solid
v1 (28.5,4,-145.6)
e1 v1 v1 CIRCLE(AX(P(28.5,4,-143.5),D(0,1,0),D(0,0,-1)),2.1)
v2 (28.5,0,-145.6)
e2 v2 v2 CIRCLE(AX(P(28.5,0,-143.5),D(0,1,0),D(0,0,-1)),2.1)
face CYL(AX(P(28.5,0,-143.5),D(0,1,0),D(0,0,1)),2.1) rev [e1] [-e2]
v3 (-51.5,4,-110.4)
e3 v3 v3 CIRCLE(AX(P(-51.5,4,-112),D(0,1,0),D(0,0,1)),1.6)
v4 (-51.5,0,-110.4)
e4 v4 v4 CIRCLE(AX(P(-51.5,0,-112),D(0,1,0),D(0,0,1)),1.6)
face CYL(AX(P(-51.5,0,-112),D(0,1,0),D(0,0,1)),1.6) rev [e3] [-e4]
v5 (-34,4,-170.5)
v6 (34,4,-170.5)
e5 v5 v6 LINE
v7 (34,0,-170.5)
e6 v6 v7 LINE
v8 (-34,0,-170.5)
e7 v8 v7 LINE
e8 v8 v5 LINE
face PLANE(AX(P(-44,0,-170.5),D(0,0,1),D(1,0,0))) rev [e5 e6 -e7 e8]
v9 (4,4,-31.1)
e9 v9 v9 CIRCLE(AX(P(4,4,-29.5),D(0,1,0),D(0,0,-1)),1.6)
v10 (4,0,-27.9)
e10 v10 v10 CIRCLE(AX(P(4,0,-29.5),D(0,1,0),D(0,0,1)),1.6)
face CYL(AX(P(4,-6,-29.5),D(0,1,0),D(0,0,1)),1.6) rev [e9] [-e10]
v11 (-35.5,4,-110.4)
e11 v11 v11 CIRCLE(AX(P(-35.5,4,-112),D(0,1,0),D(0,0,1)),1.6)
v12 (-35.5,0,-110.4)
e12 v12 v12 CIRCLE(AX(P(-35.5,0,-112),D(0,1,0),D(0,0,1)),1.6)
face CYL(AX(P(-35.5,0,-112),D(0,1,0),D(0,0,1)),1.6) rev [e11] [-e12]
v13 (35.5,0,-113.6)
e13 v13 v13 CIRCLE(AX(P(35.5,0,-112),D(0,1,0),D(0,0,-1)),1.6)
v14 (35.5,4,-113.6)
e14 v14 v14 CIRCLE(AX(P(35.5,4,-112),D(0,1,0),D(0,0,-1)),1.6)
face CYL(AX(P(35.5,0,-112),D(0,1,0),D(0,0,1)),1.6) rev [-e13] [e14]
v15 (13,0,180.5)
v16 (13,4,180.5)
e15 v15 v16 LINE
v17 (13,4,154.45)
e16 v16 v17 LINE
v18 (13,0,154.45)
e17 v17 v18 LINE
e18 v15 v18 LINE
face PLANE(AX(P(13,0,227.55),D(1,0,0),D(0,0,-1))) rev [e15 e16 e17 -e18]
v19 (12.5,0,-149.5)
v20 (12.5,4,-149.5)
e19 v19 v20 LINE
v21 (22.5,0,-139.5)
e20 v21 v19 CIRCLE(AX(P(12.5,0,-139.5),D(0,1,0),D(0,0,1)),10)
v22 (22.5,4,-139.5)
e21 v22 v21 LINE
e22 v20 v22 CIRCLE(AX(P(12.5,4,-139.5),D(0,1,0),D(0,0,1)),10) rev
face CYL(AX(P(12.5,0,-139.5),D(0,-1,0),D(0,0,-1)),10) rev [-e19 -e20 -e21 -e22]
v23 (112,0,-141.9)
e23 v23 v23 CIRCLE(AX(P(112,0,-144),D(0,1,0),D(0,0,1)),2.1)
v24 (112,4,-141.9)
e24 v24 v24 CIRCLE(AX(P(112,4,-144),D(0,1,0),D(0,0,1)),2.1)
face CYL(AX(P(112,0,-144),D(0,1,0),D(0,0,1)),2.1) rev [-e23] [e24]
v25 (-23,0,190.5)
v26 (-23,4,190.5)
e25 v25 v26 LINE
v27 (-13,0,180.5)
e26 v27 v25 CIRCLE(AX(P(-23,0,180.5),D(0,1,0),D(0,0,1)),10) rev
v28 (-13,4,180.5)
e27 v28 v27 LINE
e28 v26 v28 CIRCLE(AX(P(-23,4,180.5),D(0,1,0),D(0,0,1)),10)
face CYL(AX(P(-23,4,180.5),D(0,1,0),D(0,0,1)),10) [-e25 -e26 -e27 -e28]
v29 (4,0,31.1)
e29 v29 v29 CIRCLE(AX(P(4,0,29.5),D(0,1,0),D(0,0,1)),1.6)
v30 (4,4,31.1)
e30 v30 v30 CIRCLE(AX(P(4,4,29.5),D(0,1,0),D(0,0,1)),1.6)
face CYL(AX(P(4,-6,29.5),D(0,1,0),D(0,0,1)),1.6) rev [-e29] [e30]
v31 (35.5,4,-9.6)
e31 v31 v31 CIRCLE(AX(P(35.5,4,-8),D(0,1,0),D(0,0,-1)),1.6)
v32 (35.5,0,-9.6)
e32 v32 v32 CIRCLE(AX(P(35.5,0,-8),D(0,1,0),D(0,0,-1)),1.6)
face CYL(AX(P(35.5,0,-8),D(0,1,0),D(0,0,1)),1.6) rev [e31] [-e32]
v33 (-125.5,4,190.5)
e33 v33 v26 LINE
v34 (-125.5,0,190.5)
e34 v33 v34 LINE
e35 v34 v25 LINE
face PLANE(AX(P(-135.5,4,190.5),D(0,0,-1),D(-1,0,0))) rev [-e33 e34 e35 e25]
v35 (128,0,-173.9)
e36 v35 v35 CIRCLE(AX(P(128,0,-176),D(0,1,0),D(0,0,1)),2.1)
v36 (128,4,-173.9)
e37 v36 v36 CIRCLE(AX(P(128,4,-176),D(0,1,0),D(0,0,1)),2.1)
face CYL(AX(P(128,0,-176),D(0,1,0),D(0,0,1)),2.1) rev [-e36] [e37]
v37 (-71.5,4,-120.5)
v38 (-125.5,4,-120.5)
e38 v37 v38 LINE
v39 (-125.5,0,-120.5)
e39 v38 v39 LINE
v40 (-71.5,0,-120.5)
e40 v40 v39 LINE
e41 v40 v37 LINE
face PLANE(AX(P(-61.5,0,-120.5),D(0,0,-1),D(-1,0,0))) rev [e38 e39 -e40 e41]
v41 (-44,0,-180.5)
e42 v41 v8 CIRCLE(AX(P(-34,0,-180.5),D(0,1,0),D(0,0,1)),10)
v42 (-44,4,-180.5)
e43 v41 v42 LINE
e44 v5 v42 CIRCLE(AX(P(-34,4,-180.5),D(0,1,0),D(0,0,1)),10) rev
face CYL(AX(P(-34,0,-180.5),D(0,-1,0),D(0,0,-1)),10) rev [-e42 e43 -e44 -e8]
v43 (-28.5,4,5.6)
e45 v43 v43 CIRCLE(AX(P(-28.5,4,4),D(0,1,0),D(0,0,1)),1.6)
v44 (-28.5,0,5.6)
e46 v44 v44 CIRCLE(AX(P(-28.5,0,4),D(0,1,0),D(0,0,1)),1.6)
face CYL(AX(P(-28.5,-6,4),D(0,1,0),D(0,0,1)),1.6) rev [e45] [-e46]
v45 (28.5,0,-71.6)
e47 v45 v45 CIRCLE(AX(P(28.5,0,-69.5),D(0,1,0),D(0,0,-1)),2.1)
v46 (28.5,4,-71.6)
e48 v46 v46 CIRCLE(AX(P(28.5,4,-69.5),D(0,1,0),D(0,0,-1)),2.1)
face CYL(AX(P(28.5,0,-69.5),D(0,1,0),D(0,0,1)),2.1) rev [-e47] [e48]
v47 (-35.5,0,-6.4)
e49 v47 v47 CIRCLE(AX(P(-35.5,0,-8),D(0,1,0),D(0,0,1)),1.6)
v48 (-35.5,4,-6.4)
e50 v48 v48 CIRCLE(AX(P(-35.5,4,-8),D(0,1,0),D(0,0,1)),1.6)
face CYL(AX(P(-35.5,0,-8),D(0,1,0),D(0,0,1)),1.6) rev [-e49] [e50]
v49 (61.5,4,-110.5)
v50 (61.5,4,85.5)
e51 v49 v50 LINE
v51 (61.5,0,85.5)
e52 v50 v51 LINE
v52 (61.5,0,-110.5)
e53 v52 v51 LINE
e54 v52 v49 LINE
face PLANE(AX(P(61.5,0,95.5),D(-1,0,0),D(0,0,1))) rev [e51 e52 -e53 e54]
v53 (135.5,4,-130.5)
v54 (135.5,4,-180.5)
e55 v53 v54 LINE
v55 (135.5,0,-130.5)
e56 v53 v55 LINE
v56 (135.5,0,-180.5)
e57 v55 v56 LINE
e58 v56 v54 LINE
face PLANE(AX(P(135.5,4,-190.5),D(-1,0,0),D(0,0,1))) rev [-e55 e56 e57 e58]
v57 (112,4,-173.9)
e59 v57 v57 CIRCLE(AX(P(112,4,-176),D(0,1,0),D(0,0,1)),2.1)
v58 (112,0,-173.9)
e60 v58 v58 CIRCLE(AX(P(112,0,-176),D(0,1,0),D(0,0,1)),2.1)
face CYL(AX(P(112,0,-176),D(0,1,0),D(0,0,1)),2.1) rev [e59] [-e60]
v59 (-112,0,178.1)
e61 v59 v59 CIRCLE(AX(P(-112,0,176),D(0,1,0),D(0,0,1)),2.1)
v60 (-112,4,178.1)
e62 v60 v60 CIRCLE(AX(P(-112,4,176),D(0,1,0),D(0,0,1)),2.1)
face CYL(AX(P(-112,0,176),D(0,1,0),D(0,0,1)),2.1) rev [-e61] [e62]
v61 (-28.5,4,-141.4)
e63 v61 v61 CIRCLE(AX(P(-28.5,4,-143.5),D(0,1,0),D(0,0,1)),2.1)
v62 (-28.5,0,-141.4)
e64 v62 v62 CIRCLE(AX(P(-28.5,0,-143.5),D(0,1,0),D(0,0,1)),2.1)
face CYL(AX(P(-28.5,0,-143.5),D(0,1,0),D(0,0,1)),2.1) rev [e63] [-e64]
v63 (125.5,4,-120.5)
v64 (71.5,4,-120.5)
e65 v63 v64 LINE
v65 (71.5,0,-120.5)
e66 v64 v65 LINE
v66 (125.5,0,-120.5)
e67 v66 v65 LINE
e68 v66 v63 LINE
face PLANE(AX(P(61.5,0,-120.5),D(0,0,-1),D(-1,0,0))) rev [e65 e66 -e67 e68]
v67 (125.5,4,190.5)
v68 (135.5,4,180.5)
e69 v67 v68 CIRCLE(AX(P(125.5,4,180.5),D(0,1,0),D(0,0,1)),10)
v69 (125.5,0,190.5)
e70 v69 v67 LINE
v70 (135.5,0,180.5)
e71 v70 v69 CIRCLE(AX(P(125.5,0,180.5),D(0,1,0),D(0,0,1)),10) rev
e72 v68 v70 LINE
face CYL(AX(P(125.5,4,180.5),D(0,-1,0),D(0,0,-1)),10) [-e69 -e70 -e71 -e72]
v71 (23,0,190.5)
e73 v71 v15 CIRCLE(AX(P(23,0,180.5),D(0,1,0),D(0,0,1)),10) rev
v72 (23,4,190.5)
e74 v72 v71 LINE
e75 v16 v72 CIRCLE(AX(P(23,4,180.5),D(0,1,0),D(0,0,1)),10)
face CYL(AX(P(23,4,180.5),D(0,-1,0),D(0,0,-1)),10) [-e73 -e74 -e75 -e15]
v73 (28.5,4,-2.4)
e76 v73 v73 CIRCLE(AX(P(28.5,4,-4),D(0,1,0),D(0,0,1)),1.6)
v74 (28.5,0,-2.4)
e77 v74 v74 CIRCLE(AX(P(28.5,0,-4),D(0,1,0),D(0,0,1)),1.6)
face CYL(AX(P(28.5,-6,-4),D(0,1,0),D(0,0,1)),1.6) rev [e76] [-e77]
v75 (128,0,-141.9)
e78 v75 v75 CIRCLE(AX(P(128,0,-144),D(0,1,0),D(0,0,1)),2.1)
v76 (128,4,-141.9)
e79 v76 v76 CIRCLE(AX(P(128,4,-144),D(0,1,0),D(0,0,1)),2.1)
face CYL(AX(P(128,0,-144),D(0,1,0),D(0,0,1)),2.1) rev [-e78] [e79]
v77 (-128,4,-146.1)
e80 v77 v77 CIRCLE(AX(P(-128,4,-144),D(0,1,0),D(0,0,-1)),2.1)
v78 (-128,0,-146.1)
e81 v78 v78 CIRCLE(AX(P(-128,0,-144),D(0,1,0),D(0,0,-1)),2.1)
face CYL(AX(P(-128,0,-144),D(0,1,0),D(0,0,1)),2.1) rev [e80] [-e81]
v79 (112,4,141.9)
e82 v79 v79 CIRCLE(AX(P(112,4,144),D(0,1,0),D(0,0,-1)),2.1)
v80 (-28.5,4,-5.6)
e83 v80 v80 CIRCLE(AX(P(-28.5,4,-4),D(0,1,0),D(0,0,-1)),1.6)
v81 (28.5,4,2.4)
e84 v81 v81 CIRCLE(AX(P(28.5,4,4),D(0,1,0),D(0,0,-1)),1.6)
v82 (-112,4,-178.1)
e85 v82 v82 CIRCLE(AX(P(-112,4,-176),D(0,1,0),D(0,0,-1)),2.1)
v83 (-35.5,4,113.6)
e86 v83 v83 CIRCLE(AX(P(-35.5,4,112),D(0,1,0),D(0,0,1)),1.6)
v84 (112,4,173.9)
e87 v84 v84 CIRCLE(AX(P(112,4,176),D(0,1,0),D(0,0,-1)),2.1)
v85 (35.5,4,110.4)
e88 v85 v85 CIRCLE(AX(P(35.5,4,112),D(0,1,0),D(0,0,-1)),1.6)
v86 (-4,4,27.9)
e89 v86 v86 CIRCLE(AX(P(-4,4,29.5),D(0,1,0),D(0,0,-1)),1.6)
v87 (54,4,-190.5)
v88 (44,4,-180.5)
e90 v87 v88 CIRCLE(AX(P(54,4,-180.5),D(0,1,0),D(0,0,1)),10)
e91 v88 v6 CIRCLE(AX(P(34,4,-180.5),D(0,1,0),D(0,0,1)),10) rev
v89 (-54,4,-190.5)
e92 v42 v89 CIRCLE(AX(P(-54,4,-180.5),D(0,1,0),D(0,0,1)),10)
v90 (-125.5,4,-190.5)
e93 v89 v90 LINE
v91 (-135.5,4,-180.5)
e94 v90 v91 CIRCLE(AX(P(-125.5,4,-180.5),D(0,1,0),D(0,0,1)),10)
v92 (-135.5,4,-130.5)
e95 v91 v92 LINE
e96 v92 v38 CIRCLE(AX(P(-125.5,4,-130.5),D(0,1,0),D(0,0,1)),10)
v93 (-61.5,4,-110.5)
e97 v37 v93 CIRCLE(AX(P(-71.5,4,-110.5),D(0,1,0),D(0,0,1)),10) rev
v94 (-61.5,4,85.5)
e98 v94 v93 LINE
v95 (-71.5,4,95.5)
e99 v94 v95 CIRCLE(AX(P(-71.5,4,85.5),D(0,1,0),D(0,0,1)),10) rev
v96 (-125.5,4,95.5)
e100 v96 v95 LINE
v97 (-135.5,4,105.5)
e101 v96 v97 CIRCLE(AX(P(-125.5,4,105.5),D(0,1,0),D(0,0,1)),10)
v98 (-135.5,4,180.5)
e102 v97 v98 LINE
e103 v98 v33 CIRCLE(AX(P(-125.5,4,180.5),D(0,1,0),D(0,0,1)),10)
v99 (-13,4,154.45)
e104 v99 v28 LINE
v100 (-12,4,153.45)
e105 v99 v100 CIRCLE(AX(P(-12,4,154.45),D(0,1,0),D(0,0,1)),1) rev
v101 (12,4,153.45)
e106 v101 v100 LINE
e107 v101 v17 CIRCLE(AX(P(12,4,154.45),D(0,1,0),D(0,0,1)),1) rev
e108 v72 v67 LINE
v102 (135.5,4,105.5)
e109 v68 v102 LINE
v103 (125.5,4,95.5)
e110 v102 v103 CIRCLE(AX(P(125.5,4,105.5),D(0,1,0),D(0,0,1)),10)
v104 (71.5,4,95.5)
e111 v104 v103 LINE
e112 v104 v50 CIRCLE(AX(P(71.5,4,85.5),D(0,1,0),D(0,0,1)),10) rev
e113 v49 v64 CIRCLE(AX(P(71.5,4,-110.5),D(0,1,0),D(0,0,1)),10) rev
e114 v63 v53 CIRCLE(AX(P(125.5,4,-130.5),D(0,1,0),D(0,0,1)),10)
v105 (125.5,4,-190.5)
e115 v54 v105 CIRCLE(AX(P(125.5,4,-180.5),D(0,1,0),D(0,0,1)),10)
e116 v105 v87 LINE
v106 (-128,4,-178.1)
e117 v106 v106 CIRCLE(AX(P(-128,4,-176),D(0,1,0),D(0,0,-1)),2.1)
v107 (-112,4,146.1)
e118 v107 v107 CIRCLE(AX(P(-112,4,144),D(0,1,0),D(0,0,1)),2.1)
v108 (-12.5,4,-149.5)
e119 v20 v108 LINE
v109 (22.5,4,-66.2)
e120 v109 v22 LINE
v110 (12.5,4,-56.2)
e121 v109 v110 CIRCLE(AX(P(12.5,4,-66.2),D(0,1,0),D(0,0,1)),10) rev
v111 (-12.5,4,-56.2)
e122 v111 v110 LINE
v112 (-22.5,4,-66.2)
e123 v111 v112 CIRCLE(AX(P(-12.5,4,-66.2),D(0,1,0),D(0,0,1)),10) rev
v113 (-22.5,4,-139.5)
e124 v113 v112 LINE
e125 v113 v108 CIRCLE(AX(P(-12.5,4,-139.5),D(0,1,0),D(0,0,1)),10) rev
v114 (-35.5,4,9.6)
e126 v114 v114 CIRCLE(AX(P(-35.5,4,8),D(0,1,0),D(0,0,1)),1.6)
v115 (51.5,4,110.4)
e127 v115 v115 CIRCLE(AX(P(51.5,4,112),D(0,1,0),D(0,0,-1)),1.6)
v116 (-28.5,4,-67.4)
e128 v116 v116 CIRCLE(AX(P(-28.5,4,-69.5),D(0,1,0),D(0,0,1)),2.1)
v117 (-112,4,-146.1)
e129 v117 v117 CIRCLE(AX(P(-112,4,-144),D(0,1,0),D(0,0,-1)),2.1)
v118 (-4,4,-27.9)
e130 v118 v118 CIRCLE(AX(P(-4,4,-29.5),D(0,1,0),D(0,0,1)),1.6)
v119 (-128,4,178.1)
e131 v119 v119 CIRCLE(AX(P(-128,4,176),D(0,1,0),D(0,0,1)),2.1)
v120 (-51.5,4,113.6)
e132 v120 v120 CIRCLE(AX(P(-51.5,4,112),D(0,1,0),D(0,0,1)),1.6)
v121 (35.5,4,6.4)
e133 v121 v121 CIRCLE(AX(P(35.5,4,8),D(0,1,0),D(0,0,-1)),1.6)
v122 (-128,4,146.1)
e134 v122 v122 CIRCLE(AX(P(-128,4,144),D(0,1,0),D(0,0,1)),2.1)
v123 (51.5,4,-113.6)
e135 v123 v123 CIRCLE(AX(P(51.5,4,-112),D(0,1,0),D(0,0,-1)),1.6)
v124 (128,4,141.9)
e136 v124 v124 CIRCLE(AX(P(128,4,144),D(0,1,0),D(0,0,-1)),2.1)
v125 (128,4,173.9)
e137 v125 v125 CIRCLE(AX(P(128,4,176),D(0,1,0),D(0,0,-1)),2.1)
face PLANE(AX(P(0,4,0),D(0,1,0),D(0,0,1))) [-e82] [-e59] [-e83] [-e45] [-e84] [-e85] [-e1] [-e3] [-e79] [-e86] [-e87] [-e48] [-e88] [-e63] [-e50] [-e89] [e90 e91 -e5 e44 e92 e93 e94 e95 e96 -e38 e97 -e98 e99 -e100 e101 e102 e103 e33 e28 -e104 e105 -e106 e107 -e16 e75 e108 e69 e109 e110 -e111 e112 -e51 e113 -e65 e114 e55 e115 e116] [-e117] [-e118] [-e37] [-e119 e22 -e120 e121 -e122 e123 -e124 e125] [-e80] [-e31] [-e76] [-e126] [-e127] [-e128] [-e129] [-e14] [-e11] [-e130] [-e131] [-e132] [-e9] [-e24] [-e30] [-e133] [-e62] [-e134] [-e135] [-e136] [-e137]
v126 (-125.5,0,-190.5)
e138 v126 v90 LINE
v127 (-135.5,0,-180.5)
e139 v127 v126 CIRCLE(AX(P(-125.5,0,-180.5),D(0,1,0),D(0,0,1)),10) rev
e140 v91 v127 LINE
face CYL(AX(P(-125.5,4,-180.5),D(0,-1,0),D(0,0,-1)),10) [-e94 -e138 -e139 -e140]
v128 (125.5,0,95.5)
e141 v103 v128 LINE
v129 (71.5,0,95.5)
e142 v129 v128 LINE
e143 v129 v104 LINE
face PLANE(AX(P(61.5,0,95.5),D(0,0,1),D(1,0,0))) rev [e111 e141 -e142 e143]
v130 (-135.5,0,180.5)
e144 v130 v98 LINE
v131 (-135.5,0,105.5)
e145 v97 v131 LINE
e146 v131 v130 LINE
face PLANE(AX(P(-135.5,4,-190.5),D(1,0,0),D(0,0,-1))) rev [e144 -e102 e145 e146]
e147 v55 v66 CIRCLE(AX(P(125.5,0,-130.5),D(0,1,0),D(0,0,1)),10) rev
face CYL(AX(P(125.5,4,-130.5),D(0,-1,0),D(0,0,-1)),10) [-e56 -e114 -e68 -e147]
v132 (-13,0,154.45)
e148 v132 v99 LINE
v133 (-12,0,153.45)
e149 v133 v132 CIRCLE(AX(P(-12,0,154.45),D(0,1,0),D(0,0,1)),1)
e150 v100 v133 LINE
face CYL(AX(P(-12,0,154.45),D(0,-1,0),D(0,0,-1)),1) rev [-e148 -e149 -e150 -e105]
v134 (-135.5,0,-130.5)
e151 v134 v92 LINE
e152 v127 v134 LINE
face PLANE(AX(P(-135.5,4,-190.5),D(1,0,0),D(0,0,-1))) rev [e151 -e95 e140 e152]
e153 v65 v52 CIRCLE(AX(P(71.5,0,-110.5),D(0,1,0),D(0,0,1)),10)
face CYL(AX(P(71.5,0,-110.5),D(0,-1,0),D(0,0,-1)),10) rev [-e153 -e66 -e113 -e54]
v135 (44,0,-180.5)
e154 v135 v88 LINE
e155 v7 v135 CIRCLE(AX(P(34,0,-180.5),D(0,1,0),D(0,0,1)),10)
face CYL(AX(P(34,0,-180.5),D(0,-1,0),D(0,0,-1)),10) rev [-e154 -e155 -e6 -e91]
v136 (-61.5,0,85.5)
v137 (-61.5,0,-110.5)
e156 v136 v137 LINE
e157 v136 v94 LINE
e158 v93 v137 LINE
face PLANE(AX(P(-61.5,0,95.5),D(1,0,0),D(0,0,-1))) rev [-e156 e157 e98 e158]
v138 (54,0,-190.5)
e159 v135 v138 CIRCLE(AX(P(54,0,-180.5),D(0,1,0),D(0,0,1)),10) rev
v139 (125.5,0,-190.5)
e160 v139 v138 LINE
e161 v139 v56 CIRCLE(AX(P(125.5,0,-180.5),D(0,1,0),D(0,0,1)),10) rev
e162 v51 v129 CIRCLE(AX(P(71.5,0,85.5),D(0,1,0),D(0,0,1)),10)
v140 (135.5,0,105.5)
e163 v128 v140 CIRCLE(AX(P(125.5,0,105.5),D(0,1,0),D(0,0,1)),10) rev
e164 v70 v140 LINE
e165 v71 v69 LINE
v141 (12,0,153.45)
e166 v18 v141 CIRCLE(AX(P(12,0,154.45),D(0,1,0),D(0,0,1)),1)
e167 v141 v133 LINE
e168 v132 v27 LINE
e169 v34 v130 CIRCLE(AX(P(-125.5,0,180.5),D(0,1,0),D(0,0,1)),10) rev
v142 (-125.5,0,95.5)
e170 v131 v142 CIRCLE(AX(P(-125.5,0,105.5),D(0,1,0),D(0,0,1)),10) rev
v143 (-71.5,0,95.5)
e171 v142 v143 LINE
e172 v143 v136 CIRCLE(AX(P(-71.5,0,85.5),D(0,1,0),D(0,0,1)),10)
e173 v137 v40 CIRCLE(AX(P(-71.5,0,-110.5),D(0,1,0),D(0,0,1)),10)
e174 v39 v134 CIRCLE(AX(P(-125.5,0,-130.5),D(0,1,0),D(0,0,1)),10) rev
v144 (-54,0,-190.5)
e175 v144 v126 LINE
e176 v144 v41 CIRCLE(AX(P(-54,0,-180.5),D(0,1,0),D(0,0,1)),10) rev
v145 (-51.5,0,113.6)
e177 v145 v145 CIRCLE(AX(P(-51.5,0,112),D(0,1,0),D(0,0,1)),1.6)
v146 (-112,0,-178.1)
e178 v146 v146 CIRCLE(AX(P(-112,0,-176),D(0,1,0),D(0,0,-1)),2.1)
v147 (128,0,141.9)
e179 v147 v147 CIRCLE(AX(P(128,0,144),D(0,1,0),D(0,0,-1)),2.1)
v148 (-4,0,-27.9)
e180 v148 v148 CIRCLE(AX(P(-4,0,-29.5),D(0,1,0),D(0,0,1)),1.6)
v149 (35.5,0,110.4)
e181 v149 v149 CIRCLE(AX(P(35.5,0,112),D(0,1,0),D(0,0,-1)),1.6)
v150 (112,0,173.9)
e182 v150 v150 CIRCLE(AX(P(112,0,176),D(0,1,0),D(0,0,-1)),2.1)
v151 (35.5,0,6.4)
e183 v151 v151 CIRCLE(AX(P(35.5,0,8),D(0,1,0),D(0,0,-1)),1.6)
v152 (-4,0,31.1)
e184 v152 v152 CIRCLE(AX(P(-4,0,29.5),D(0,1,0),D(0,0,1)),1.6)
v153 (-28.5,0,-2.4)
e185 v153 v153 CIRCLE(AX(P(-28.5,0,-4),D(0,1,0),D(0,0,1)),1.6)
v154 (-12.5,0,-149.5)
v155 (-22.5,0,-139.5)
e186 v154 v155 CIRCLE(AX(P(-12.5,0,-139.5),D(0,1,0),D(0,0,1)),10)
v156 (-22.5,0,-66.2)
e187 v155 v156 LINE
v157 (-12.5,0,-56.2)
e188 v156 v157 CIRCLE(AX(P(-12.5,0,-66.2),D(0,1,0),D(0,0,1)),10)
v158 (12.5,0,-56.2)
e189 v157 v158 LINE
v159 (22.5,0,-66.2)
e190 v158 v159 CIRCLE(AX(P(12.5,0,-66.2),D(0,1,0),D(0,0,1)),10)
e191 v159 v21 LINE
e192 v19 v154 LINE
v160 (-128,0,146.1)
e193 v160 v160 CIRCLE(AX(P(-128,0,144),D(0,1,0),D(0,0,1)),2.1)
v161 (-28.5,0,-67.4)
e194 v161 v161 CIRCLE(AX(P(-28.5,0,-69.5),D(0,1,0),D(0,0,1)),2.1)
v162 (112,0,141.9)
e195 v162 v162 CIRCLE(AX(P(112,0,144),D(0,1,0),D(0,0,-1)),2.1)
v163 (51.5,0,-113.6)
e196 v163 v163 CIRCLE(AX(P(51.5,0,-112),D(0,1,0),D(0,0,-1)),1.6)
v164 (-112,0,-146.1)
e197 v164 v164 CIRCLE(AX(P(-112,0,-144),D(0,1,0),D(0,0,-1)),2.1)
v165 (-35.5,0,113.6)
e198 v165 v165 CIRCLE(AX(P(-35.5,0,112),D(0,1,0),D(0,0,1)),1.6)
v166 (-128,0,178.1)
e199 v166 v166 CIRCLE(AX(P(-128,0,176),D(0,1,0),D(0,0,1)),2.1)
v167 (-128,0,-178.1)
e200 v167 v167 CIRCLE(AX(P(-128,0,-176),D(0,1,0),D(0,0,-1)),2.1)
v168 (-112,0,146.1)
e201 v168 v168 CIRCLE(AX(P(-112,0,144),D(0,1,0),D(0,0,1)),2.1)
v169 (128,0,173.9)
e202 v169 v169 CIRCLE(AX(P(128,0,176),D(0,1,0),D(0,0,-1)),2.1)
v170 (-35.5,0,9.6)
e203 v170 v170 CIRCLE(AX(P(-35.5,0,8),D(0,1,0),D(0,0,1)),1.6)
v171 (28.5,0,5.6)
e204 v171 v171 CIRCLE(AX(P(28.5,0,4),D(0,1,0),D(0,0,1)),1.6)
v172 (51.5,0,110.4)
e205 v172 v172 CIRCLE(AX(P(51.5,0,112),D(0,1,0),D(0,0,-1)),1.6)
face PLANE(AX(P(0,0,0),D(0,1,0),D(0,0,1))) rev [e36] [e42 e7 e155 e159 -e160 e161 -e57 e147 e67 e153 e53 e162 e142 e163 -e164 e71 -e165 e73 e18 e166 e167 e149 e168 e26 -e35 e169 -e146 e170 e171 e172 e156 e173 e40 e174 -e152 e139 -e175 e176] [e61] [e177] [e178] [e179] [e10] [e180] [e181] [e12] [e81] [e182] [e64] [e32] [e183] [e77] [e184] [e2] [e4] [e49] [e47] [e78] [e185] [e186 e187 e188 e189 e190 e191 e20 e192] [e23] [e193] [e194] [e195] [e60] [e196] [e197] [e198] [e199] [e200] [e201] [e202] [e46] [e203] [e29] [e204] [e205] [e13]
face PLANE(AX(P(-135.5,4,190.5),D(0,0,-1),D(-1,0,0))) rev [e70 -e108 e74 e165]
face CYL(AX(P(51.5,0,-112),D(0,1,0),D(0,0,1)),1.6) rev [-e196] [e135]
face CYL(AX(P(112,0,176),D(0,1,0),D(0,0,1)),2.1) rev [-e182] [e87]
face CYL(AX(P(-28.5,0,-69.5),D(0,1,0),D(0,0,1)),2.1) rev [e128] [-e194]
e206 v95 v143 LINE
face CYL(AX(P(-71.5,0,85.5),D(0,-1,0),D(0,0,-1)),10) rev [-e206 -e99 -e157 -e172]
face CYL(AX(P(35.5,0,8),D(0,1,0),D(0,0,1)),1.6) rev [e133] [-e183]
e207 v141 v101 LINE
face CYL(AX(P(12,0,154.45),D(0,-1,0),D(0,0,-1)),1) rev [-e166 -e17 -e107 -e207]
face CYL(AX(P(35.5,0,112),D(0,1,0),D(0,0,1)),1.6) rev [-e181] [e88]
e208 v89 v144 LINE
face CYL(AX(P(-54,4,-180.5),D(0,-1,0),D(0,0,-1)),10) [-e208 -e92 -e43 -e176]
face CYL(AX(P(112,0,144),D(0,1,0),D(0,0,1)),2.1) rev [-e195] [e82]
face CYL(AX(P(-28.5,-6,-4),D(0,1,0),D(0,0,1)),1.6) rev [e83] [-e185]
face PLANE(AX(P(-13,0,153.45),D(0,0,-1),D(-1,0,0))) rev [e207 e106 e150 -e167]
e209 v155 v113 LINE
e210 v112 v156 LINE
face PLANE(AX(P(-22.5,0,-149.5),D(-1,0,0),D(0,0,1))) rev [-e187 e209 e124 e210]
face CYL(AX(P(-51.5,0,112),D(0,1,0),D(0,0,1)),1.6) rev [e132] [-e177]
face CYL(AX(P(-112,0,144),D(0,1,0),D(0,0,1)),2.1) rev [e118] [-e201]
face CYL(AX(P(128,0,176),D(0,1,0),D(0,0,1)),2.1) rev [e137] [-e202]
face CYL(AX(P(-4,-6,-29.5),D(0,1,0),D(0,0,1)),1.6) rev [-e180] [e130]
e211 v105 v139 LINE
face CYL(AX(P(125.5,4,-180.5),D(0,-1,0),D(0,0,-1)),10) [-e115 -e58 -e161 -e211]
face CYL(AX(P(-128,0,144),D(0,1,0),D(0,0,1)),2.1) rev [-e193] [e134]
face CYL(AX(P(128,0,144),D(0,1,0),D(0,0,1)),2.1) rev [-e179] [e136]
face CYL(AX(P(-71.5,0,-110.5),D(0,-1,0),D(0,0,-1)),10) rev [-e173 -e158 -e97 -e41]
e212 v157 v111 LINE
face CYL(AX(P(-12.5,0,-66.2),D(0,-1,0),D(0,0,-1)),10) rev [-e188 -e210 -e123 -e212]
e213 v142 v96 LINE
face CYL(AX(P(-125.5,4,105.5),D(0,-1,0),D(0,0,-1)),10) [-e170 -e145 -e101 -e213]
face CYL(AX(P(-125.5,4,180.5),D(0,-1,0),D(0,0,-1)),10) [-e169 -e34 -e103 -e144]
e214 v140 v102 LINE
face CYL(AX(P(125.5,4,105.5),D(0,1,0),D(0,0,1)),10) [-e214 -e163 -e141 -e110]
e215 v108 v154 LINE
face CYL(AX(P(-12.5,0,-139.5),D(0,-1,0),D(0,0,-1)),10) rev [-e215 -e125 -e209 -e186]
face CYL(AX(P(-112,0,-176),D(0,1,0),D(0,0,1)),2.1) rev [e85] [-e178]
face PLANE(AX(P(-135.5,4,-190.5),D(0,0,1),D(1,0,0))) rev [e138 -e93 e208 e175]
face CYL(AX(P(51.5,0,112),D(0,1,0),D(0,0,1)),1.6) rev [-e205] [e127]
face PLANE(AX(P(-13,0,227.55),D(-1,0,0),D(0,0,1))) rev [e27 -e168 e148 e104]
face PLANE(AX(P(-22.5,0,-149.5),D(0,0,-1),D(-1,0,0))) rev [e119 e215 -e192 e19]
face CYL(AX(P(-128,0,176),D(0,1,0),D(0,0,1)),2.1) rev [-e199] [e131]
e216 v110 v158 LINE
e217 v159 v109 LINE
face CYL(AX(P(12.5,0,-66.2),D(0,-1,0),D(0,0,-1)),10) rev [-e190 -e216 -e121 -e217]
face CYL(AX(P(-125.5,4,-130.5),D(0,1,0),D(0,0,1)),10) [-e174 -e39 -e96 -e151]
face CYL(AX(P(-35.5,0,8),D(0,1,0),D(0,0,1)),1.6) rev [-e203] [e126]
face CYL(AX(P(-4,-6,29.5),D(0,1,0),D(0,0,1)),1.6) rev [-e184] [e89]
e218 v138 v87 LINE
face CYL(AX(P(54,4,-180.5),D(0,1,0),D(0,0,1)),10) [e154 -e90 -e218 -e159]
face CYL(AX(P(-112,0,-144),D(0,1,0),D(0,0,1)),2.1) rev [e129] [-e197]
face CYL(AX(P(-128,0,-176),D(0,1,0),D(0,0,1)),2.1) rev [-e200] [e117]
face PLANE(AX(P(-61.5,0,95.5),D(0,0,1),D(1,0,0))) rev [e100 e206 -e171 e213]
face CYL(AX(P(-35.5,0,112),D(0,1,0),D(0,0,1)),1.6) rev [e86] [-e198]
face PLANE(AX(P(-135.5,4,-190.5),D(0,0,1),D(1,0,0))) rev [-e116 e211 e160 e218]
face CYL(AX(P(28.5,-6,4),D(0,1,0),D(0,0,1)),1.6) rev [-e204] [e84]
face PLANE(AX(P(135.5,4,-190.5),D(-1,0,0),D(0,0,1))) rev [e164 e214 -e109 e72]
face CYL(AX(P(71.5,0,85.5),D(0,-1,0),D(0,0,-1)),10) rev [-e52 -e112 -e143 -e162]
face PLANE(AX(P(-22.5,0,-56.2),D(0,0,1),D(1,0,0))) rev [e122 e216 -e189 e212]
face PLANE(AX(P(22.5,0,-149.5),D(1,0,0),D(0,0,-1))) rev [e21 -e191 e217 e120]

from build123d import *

# Parameters (mm, degrees)
SKETCH_1_W           = 271
SKETCH_1_H           = 381
EXTRUDE_2_DEPTH      = 4
SKETCH_4_R           = 2.1
CUT_EXTRUDE_3_DEPTH  = 4
SKETCH_5_W           = 26
SKETCH_5_H           = 74.1
CUT_EXTRUDE_4_DEPTH  = 4
SKETCH_6_W           = 148
SKETCH_6_H           = 216
CUT_EXTRUDE_6_DEPTH  = 4
SKETCH_7_R           = 1.6
CUT_EXTRUDE_7_DEPTH  = 4
SKETCH_8_R           = 1.6
CUT_EXTRUDE_8_DEPTH  = 4
SKETCH_9_W           = 45
SKETCH_9_H           = 93.3
CUT_EXTRUDE_9_DEPTH  = 4
SKETCH_10_R          = 2.1
CUT_EXTRUDE_10_DEPTH = 4
SKETCH_11_R          = 1.6
CUT_EXTRUDE_11_DEPTH = 4
SKETCH_12_R          = 2.1
CUT_EXTRUDE_12_DEPTH = 4
SKETCH_13_W          = 88
SKETCH_13_H          = 40
CUT_EXTRUDE_13_DEPTH = 4
FILLET_3_R           = 10
FILLET_5_R           = 10
FILLET_6_R           = 1
SKETCH_15_R          = 1.6
CUT_EXTRUDE_17_DEPTH = 10


with BuildPart() as part:
    # 草图1 → 凸台-拉伸2 (new body)
    with BuildSketch(Plane(origin=(0, 0, 0), x_dir=(1, 0, 0), z_dir=(0, 1, 0))):
        Rectangle(SKETCH_1_W, SKETCH_1_H)
    extrude(amount=EXTRUDE_2_DEPTH)

    # 草图4 → 切除-拉伸3 (cut)
    with BuildSketch(Plane(origin=(0, 4, 0), x_dir=(1, 0, 0), z_dir=(0, 1, 0))):
        with Locations(Location((-128, -176, 0), (0, 0, 270))):
            Circle(SKETCH_4_R)
        with Locations(Location((-128, -144, 0), (0, 0, 270))):
            Circle(SKETCH_4_R)
        with Locations(Location((-112, -144, 0), (0, 0, 270))):
            Circle(SKETCH_4_R)
        with Locations(Location((-112, -176, 0), (0, 0, 270))):
            Circle(SKETCH_4_R)
        with Locations(Location((112, -144, 0), (0, 0, 90))):
            Circle(SKETCH_4_R)
        with Locations(Location((128, -144, 0), (0, 0, 90))):
            Circle(SKETCH_4_R)
        with Locations(Location((128, -176, 0), (0, 0, 90))):
            Circle(SKETCH_4_R)
        with Locations(Location((112, -176, 0), (0, 0, 90))):
            Circle(SKETCH_4_R)
        with Locations(Location((112, 176, 0), (0, 0, 270))):
            Circle(SKETCH_4_R)
        with Locations(Location((128, 176, 0), (0, 0, 270))):
            Circle(SKETCH_4_R)
        with Locations(Location((128, 144, 0), (0, 0, 270))):
            Circle(SKETCH_4_R)
        with Locations(Location((112, 144, 0), (0, 0, 270))):
            Circle(SKETCH_4_R)
        with Locations(Location((-112, 176, 0), (0, 0, 90))):
            Circle(SKETCH_4_R)
        with Locations(Location((-112, 144, 0), (0, 0, 90))):
            Circle(SKETCH_4_R)
        with Locations(Location((-128, 144, 0), (0, 0, 90))):
            Circle(SKETCH_4_R)
        with Locations(Location((-128, 176, 0), (0, 0, 90))):
            Circle(SKETCH_4_R)
    extrude(amount=-CUT_EXTRUDE_3_DEPTH, mode=Mode.SUBTRACT)

    # 草图5 → 切除-拉伸4 (cut)
    with BuildSketch(Plane(origin=(0, 4, 0), x_dir=(1, 0, 0), z_dir=(0, 1, 0))):
        with Locations((0, -190.5)):
            Rectangle(SKETCH_5_W, SKETCH_5_H)
    extrude(amount=-CUT_EXTRUDE_4_DEPTH, mode=Mode.SUBTRACT)

    # 草图6 → 切除-拉伸6 (cut)
    with BuildSketch(Plane(origin=(0, 4, 0), x_dir=(1, 0, 0), z_dir=(0, 1, 0))):
        with Locations((135.5, 12.5)):
            Rectangle(SKETCH_6_W, SKETCH_6_H)
        with Locations((-135.5, 12.5)):
            Rectangle(SKETCH_6_W, SKETCH_6_H)
    extrude(amount=-CUT_EXTRUDE_6_DEPTH, mode=Mode.SUBTRACT)

    # 草图7 → 切除-拉伸7 (cut)
    with BuildSketch(Plane(origin=(0, 4, 0), x_dir=(1, 0, 0), z_dir=(0, 1, 0))):
        with Locations(Location((-51.5, -112, 0), (0, 0, 270))):
            Circle(SKETCH_7_R)
        with Locations(Location((-35.5, -112, 0), (0, 0, 270))):
            Circle(SKETCH_7_R)
        with Locations(Location((35.5, -112, 0), (0, 0, 90))):
            Circle(SKETCH_7_R)
        with Locations(Location((51.5, -112, 0), (0, 0, 90))):
            Circle(SKETCH_7_R)
    extrude(amount=-CUT_EXTRUDE_7_DEPTH, mode=Mode.SUBTRACT)

    # 草图8 → 切除-拉伸8 (cut)
    with BuildSketch(Plane(origin=(0, 4, 0), x_dir=(1, 0, 0), z_dir=(0, 1, 0))):
        with Locations(Location((-35.5, 8, 0), (0, 0, 270))):
            Circle(SKETCH_8_R)
        with Locations(Location((-35.5, -8, 0), (0, 0, 270))):
            Circle(SKETCH_8_R)
        with Locations(Location((35.5, -8, 0), (0, 0, 90))):
            Circle(SKETCH_8_R)
        with Locations(Location((35.5, 8, 0), (0, 0, 90))):
            Circle(SKETCH_8_R)
    extrude(amount=-CUT_EXTRUDE_8_DEPTH, mode=Mode.SUBTRACT)

    # 草图9 → 切除-拉伸9 (cut)
    with BuildSketch(Plane(origin=(0, 4, 0), x_dir=(1, 0, 0), z_dir=(0, 1, 0))):
        with Locations((0, 102.85)):
            Rectangle(SKETCH_9_W, SKETCH_9_H)
    extrude(amount=-CUT_EXTRUDE_9_DEPTH, mode=Mode.SUBTRACT)

    # 草图10 → 切除-拉伸10 (cut)
    with BuildSketch(Plane(origin=(0, 4, 0), x_dir=(1, 0, 0), z_dir=(0, 1, 0))):
        with Locations(Location((-28.5, 69.5, 0), (0, 0, 270))):
            Circle(SKETCH_10_R)
        with Locations(Location((28.5, 69.5, 0), (0, 0, 90))):
            Circle(SKETCH_10_R)
    extrude(amount=-CUT_EXTRUDE_10_DEPTH, mode=Mode.SUBTRACT)

    # 草图11 → 切除-拉伸11 (cut)
    with BuildSketch(Plane(origin=(0, 4, 0), x_dir=(1, 0, 0), z_dir=(0, 1, 0))):
        with Locations(Location((-51.5, 112, 0), (0, 0, 270))):
            Circle(SKETCH_11_R)
        with Locations(Location((-35.5, 112, 0), (0, 0, 270))):
            Circle(SKETCH_11_R)
        with Locations(Location((35.5, 112, 0), (0, 0, 90))):
            Circle(SKETCH_11_R)
        with Locations(Location((51.5, 112, 0), (0, 0, 90))):
            Circle(SKETCH_11_R)
    extrude(amount=-CUT_EXTRUDE_11_DEPTH, mode=Mode.SUBTRACT)

    # 草图12 → 切除-拉伸12 (cut)
    with BuildSketch(Plane(origin=(0, 4, 0), x_dir=(1, 0, 0), z_dir=(0, 1, 0))):
        with Locations(Location((-28.5, 143.5, 0), (0, 0, 270))):
            Circle(SKETCH_12_R)
        with Locations(Location((28.5, 143.5, 0), (0, 0, 90))):
            Circle(SKETCH_12_R)
    extrude(amount=-CUT_EXTRUDE_12_DEPTH, mode=Mode.SUBTRACT)

    # 草图13 → 切除-拉伸13 (cut)
    with BuildSketch(Plane(origin=(0, 4, 0), x_dir=(1, 0, 0), z_dir=(0, 1, 0))):
        with Locations((0, 190.5)):
            Rectangle(SKETCH_13_W, SKETCH_13_H)
    extrude(amount=-CUT_EXTRUDE_13_DEPTH, mode=Mode.SUBTRACT)

    # 圆角3
    fillet_3_edges = [part.edges().sort_by_distance(p)[0] for p in [
        (22.5, 2, -149.5),
        (22.5, 2, -56.2),
        (-22.5, 2, -56.2),
        (-22.5, 2, -149.5),
    ]]
    fillet(fillet_3_edges, radius=FILLET_3_R)

    # 圆角5
    fillet_5_edges = [part.edges().sort_by_distance(p)[0] for p in [
        (-44, 2, -170.5),
        (-44, 2, -190.5),
        (-135.5, 2, -190.5),
        (-135.5, 2, -120.5),
        (-61.5, 2, -120.5),
        (-61.5, 2, 95.5),
        (-135.5, 2, 95.5),
        (-135.5, 2, 190.5),
        (-13, 2, 190.5),
        (13, 2, 190.5),
        (135.5, 2, 190.5),
        (135.5, 2, 95.5),
        (61.5, 2, 95.5),
        (61.5, 2, -120.5),
        (135.5, 2, -120.5),
        (135.5, 2, -190.5),
        (44, 2, -190.5),
        (44, 2, -170.5),
    ]]
    fillet(fillet_5_edges, radius=FILLET_5_R - 0.0001)  # a hair under: the kernel refuses the full size

    # 圆角6
    fillet_6_edges = [part.edges().sort_by_distance(p)[0] for p in [
        (13, 2, 153.45),
        (-13, 2, 153.45),
    ]]
    fillet(fillet_6_edges, radius=FILLET_6_R)

    # 草图15 → 切除-拉伸17 (cut)
    with BuildSketch(Plane(origin=(0, 4, 0), x_dir=(1, 0, 0), z_dir=(0, 1, 0))):
        with Locations(Location((-28.5, -4, 0), (0, 0, 270))):
            Circle(SKETCH_15_R)
        with Locations(Location((-28.5, 4, 0), (0, 0, 270))):
            Circle(SKETCH_15_R)
        with Locations(Location((-4, 29.5, 0), (0, 0, 270))):
            Circle(SKETCH_15_R)
        with Locations(Location((28.5, 4, 0), (0, 0, 270))):
            Circle(SKETCH_15_R)
        with Locations(Location((28.5, -4, 0), (0, 0, 270))):
            Circle(SKETCH_15_R)
        with Locations(Location((4, 29.5, 0), (0, 0, 270))):
            Circle(SKETCH_15_R)
        with Locations(Location((4, -29.5, 0), (0, 0, 270))):
            Circle(SKETCH_15_R)
        with Locations(Location((-4, -29.5, 0), (0, 0, 270))):
            Circle(SKETCH_15_R)
    extrude(amount=-CUT_EXTRUDE_17_DEPTH, mode=Mode.SUBTRACT)


solid = part.part
